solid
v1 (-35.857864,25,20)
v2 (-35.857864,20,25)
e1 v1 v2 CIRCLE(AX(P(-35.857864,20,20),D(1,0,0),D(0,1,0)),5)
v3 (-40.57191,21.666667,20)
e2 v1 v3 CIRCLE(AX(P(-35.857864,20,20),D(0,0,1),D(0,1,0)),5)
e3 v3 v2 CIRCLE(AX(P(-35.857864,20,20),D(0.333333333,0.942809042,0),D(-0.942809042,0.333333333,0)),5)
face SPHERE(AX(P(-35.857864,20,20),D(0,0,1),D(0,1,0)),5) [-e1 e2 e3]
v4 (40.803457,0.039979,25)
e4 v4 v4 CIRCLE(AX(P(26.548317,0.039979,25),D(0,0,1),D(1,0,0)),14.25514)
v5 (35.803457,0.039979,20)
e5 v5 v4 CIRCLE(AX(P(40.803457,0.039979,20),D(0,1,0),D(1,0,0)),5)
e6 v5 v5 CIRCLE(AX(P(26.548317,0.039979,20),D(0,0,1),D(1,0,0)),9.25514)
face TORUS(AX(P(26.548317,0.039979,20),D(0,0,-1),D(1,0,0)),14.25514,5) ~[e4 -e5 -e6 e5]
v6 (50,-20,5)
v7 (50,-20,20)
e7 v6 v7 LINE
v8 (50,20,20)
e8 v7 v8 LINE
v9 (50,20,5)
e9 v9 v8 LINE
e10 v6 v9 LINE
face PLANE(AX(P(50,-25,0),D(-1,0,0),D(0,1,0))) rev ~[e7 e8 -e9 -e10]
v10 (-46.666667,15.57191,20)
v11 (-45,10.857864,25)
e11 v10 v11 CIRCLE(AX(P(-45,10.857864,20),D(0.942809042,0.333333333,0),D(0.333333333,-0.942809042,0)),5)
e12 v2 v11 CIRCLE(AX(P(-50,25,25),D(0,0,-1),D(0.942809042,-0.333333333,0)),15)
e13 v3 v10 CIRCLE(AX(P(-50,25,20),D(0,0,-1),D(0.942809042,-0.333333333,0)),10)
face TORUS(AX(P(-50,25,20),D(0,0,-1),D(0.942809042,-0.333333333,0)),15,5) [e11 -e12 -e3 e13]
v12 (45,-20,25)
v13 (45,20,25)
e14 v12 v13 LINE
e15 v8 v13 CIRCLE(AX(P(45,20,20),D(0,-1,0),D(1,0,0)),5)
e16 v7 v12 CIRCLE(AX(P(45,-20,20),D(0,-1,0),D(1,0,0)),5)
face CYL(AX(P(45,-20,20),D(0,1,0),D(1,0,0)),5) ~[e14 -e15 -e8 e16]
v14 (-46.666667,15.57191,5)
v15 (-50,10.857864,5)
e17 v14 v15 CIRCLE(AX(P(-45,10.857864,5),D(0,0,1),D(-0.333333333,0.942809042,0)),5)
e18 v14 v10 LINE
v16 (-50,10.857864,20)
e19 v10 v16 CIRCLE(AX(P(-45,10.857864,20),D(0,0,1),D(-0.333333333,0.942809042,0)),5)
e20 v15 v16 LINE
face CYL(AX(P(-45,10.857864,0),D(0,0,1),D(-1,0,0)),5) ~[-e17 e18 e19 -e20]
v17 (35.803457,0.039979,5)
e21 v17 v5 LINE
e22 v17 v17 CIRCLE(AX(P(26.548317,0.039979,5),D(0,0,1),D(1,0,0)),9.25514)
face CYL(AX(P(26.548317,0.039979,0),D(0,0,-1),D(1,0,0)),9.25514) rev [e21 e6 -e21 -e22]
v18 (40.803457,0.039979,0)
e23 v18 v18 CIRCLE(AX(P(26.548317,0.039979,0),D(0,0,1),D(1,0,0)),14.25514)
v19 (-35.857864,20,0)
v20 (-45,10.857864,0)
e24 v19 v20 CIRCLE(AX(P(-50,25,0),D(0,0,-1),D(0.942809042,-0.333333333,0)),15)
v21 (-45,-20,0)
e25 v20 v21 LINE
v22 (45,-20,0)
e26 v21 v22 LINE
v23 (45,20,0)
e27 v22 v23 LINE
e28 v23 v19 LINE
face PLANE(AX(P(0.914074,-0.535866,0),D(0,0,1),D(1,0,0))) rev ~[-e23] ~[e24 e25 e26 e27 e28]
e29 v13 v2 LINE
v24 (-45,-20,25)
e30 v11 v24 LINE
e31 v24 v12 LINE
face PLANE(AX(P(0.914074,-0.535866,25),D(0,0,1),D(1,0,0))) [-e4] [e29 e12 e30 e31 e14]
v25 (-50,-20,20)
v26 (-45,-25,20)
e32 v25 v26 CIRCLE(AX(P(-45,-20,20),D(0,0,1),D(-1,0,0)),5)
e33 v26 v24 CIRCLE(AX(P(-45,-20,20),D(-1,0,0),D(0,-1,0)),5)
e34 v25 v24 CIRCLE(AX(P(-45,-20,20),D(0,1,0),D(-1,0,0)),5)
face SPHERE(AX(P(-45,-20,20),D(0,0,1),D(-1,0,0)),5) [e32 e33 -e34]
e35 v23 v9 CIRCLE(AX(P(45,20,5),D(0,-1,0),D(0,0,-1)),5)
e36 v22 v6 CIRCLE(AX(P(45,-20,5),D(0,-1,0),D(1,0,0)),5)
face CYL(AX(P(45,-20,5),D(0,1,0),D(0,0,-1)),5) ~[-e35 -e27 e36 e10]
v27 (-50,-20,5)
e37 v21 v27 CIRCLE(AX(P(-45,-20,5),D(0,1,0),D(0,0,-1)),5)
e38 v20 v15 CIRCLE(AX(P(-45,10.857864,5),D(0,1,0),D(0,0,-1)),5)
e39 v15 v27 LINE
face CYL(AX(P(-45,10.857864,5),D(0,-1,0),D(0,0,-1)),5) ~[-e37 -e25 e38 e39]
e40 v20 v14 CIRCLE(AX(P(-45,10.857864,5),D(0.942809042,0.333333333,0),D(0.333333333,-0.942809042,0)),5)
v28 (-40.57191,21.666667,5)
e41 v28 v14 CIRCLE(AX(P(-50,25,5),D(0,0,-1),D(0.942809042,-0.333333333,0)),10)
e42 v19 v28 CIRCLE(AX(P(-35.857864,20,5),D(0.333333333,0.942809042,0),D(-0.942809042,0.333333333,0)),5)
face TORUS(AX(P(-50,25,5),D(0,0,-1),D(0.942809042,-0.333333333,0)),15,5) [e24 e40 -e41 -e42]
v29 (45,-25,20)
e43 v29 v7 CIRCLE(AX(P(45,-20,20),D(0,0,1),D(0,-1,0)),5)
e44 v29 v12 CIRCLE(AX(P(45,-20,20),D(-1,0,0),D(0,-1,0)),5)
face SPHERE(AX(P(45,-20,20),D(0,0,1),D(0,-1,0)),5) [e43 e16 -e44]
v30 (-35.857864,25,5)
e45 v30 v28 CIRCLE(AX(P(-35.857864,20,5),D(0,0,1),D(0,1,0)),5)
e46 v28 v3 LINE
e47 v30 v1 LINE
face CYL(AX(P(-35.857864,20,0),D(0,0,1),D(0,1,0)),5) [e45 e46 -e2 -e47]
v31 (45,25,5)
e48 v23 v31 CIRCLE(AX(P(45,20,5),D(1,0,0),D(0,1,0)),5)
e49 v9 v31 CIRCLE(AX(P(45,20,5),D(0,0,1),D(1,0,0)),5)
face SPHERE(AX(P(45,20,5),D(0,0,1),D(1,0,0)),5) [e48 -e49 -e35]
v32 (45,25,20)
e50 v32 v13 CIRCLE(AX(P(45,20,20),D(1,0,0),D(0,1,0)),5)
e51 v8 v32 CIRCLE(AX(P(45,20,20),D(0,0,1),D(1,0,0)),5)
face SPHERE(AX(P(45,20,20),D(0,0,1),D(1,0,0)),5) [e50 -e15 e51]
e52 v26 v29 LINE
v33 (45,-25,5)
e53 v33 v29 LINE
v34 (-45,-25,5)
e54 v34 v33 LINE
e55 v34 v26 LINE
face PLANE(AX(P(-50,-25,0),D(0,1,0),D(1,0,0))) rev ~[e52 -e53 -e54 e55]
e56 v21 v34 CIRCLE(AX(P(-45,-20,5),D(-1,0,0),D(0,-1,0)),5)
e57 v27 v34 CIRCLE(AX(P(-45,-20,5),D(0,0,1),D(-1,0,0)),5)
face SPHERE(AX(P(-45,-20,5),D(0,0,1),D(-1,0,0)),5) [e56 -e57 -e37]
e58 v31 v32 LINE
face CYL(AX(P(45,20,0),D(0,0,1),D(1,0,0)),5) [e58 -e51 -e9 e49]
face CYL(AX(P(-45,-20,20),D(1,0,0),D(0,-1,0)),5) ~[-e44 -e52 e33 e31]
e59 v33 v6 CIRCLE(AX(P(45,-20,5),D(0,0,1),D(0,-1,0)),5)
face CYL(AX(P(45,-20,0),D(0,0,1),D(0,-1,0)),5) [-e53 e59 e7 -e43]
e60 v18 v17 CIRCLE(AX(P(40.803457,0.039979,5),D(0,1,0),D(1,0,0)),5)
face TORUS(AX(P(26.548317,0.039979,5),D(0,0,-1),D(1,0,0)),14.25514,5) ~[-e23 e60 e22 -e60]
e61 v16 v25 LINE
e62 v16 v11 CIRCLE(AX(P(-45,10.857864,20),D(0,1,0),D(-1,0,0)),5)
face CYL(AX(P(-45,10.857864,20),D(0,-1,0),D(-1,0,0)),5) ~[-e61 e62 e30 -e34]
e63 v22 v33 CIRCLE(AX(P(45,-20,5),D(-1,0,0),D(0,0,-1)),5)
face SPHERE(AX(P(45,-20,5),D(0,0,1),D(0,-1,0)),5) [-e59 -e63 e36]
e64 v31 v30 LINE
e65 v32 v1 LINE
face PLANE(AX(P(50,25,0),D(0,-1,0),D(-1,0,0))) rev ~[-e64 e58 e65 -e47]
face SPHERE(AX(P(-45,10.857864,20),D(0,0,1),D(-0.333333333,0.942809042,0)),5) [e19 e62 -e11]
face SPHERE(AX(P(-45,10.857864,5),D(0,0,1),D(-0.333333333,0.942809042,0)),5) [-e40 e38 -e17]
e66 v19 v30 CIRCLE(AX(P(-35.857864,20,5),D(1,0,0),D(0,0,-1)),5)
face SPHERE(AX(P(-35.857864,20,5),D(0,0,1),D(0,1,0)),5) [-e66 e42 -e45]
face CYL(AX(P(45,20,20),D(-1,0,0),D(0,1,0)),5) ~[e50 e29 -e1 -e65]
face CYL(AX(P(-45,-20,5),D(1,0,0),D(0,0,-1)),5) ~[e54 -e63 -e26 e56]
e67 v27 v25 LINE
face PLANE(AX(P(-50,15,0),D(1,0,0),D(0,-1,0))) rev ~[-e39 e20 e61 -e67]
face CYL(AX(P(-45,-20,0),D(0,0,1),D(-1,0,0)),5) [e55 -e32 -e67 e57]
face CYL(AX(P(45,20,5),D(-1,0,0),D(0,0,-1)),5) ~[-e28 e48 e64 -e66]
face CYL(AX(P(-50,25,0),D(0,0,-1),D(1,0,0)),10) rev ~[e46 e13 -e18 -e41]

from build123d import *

# Parameters (mm, degrees)
F0_R     = 9.2551404176
F1_DEPTH = 25
F3_F1_R  = 5
F3_F2_R  = 5
F3_F3_R  = 5
F3_F4_R  = 5
F3_F5_R  = 5
F3_F6_R  = 5
F3_F7_R  = 5
F3_F8_R  = 5
F3_F9_R  = 5


# Not quite as in the source:
# - a feature of the source that left no trace in its solid (it failed there, or was rolled back) is left out


with BuildPart() as f1:
    # F0 (on Top) → F1 (new body)
    with BuildSketch(Plane.XY):
        with BuildLine():
            Line((50, -25), (50, 25))
            Line((50, 25), (-40, 25))
            ThreePointArc((-40, 25), (-42.9289321881, 17.9289321881), (-50, 15))
            Line((-50, 15), (-50, -25))
            Line((-50, -25), (50, -25))
        make_face()
        with Locations((26.5483168381, 0.0399786921)):
            Circle(F0_R, mode=Mode.SUBTRACT)
    extrude(amount=F1_DEPTH)

    # F3: fillet of radius 5 on 15 edges, made by hand

    # F3_f1
    f3_f1_edges = [f1.edges().sort_by_distance(p)[0] for p in [
        (-50, 15, 12.5),
    ]]
    fillet(f3_f1_edges, radius=F3_F1_R)

    # F3_f2
    f3_f2_edges = [f1.edges().sort_by_distance(p)[0] for p in [
        (-50, -25, 12.5),
    ]]
    fillet(f3_f2_edges, radius=F3_F2_R)

    # F3_f3
    f3_f3_edges = [f1.edges().sort_by_distance(p)[0] for p in [
        (50, -25, 12.5),
    ]]
    fillet(f3_f3_edges, radius=F3_F3_R)

    # F3_f4
    f3_f4_edges = [f1.edges().sort_by_distance(p)[0] for p in [
        (50, 25, 12.5),
    ]]
    fillet(f3_f4_edges, radius=F3_F4_R)

    # F3_f5
    f3_f5_edges = [f1.edges().sort_by_distance(p)[0] for p in [
        (-40, 25, 12.5),
    ]]
    fillet(f3_f5_edges, radius=F3_F5_R)

    # F3_f6
    f3_f6_edges = [f1.edges().sort_by_distance(p)[0] for p in [
        (-50, -4.5710678119, 0),
    ]]
    fillet(f3_f6_edges, radius=F3_F6_R)

    # F3_f7
    f3_f7_edges = [f1.edges().sort_by_distance(p)[0] for p in [
        (-50, -4.5710678119, 25),
    ]]
    fillet(f3_f7_edges, radius=F3_F7_R)

    # F3_f8
    f3_f8_edges = [f1.edges().sort_by_distance(p)[0] for p in [
        (17.2931764204, 0.0399786921, 0),
    ]]
    fillet(f3_f8_edges, radius=F3_F8_R)

    # F3_f9
    f3_f9_edges = [f1.edges().sort_by_distance(p)[0] for p in [
        (17.2931764204, 0.0399786921, 25),
    ]]
    fillet(f3_f9_edges, radius=F3_F9_R)


solid = f1.part
